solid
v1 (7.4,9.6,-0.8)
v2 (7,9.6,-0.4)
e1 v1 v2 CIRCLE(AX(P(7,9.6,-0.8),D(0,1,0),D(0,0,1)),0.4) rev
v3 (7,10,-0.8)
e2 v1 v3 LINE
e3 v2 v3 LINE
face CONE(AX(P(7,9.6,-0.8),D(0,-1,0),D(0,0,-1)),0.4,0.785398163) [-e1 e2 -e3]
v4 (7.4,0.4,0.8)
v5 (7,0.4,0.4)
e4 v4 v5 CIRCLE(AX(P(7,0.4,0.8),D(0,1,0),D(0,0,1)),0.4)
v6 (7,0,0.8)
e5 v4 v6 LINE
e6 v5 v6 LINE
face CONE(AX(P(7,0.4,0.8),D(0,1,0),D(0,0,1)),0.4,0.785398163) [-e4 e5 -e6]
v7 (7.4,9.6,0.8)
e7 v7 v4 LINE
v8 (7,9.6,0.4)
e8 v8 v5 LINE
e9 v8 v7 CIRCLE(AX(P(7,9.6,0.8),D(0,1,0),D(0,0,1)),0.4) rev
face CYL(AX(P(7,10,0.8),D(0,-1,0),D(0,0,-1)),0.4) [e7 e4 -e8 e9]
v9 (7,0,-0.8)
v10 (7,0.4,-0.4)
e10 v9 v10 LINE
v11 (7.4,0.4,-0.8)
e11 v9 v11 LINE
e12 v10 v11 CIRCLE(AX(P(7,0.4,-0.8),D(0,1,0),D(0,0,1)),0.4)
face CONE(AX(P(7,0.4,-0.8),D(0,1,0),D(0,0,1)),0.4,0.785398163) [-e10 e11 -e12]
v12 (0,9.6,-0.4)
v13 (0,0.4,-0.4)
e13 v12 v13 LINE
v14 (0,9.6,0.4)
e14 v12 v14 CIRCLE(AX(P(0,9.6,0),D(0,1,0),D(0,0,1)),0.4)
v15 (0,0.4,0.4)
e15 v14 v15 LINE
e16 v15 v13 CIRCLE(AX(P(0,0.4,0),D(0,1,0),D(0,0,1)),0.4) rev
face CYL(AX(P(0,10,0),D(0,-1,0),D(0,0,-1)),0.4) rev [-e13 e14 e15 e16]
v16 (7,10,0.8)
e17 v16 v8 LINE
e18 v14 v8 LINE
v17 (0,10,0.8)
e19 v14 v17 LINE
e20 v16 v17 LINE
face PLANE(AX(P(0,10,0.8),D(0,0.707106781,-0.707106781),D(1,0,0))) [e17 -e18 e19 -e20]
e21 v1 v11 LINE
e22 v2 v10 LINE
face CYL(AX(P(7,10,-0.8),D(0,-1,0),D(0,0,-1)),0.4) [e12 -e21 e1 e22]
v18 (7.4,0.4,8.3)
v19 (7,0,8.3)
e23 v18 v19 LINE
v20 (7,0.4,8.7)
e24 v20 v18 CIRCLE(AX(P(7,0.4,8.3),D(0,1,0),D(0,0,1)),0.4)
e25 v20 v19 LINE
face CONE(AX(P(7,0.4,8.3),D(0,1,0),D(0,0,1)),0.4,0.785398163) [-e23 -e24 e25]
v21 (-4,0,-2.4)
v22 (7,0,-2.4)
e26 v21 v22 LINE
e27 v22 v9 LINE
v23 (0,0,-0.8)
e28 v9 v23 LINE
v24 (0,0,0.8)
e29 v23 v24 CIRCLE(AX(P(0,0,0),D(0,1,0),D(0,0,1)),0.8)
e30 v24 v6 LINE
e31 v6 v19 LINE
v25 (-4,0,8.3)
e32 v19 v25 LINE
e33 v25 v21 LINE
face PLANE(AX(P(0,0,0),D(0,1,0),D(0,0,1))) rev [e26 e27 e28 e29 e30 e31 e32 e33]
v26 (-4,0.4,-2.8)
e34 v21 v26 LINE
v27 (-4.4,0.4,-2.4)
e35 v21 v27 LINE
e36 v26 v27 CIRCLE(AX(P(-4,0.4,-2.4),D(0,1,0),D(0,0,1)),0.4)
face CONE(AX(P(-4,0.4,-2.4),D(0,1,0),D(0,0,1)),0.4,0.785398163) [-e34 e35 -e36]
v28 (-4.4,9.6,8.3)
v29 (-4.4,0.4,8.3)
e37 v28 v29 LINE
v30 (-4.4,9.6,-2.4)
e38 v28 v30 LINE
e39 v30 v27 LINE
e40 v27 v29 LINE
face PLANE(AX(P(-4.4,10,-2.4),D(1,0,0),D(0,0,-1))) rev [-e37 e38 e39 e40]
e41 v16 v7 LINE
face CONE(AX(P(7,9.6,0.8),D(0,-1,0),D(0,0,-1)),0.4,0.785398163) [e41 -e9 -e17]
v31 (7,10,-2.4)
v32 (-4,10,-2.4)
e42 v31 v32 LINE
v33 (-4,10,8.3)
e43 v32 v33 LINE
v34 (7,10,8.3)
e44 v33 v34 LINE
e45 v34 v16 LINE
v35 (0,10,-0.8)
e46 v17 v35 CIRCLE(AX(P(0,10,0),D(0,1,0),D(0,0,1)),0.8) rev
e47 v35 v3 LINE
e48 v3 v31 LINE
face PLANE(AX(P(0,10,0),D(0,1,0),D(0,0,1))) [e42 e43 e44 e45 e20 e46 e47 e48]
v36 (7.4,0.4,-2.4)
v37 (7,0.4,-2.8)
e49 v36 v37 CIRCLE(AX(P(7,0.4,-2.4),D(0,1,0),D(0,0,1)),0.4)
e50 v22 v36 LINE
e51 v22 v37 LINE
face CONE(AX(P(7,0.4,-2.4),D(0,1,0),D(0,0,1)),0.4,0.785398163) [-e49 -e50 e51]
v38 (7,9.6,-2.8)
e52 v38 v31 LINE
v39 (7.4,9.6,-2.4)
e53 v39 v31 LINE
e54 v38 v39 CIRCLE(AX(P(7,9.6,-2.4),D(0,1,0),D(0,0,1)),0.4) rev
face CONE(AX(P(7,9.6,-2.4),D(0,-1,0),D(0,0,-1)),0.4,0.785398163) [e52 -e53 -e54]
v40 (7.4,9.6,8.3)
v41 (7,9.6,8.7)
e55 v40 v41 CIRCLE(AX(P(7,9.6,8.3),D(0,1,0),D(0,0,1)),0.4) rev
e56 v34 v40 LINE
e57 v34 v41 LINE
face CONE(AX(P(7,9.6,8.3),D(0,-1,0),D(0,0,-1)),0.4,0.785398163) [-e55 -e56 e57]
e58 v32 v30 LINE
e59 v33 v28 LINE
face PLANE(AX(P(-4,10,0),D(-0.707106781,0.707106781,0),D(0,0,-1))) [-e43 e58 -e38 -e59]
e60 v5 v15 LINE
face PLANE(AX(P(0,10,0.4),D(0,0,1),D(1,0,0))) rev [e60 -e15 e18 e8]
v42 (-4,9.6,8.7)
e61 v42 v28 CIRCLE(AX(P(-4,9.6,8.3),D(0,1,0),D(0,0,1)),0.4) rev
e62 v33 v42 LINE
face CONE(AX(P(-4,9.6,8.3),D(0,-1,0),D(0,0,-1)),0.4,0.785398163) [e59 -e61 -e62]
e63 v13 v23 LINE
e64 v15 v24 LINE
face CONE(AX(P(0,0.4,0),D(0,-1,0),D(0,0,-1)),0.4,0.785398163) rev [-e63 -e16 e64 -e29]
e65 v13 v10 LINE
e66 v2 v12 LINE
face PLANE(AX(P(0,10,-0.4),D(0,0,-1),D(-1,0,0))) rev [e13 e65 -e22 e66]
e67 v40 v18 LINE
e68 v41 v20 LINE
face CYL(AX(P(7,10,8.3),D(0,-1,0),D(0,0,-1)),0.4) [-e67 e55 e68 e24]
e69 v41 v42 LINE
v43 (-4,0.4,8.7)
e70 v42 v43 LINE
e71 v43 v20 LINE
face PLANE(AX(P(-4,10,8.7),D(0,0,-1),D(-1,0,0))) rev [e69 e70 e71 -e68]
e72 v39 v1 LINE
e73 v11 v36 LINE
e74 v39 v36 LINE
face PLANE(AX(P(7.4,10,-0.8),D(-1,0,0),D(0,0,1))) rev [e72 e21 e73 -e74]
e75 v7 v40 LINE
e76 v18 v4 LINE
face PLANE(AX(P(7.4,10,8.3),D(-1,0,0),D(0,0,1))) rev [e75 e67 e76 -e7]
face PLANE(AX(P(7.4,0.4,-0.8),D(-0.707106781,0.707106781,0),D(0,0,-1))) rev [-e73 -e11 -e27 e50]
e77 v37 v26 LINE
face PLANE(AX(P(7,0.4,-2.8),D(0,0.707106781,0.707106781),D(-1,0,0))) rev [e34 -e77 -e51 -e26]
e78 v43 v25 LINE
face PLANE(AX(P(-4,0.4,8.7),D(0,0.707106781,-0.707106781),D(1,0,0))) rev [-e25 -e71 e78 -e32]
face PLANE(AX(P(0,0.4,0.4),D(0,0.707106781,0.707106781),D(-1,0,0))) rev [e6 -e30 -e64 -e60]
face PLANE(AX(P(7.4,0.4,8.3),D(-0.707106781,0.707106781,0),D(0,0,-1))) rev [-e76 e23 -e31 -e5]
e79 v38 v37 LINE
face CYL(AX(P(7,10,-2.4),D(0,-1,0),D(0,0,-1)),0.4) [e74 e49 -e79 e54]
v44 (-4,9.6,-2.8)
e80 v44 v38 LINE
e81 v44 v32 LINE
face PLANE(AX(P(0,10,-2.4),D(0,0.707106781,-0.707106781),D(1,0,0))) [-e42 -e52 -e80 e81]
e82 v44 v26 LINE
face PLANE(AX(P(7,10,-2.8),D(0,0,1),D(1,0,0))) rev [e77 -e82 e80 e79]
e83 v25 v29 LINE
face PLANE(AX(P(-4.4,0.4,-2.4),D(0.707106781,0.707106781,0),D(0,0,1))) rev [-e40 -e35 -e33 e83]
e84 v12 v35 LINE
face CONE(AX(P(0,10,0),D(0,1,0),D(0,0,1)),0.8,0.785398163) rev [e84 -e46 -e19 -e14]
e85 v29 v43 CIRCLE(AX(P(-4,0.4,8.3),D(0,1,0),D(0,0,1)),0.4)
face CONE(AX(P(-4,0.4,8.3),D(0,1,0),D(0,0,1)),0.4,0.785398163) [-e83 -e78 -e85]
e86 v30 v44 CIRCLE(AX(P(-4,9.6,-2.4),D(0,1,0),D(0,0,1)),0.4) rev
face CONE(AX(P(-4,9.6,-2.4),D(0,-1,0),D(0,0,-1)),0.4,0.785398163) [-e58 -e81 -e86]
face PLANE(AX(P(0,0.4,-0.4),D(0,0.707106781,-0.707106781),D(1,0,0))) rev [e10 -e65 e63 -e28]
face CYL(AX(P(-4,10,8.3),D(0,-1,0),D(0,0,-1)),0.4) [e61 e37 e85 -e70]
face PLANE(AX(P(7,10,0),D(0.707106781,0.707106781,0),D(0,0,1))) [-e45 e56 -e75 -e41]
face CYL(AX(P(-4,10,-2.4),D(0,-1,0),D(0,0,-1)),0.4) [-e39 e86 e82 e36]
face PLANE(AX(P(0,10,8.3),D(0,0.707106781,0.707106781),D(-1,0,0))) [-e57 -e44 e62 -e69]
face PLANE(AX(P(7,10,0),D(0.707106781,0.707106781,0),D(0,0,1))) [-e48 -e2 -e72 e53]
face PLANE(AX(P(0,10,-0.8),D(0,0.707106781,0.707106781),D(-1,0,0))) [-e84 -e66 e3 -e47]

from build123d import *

# Parameters (mm, degrees)
BOSS_EXTRUDE1_DEPTH = 10
CHAMFER1_SIZE       = 0.4


with BuildPart() as part:
    # Sketch1 → Boss-Extrude1 (new body)
    with BuildSketch(Plane(origin=(0, 0, 0), x_dir=(1, 0, 0), z_dir=(0, 1, 0))):
        with BuildLine():
            Line((0, 0.4), (7, 0.4))
            ThreePointArc((7, 0.4), (7.282842712, 0.517157288), (7.4, 0.8))
            Line((7.4, 0.8), (7.4, 2.4))
            ThreePointArc((7.4, 2.4), (7.282842712, 2.682842712), (7, 2.8))
            Line((7, 2.8), (-4, 2.8))
            ThreePointArc((-4, 2.8), (-4.282842712, 2.682842712), (-4.4, 2.4))
            Line((-4.4, 2.4), (-4.4, -8.3))
            ThreePointArc((-4.4, -8.3), (-4.282842712, -8.582842712), (-4, -8.7))
            Line((-4, -8.7), (7, -8.7))
            ThreePointArc((7, -8.7), (7.282842712, -8.582842712), (7.4, -8.3))
            Line((7.4, -8.3), (7.4, -0.8))
            ThreePointArc((7.4, -0.8), (7.282842712, -0.517157288), (7, -0.4))
            Line((7, -0.4), (0, -0.4))
            ThreePointArc((0, -0.4), (-0.4, 0), (0, 0.4))
        make_face()
    extrude(amount=BOSS_EXTRUDE1_DEPTH)

    # Chamfer1
    chamfer1_edges = [part.edges().sort_by_distance(p)[0] for p in [
        (7.282842712, 10, -0.517157288),
        (3.5, 0, 0.4),
        (7.282842712, 0, 0.517157288),
        (7.4, 0, 4.55),
        (7.282842712, 0, 8.582842712),
        (1.5, 0, 8.7),
        (-4.282842712, 0, 8.582842712),
        (-4.4, 0, 2.95),
        (-4.282842712, 0, -2.682842712),
        (7.4, 10, -1.6),
        (1.5, 0, -2.8),
        (7.282842712, 0, -2.682842712),
        (7.4, 0, -1.6),
        (7.282842712, 0, -0.517157288),
        (3.5, 0, -0.4),
        (-0.4, 0, 0),
        (7.282842712, 10, -2.682842712),
        (1.5, 10, -2.8),
        (-4.282842712, 10, -2.682842712),
        (-4.4, 10, 2.95),
        (-4.282842712, 10, 8.582842712),
        (1.5, 10, 8.7),
        (7.282842712, 10, 8.582842712),
        (7.4, 10, 4.55),
        (-0.4, 10, 0),
        (7.282842712, 10, 0.517157288),
        (3.5, 10, 0.4),
        (3.5, 10, -0.4),
    ]]
    chamfer(chamfer1_edges, length=CHAMFER1_SIZE - 0.0001)  # a hair under: the kernel refuses the full size


solid = part.part
